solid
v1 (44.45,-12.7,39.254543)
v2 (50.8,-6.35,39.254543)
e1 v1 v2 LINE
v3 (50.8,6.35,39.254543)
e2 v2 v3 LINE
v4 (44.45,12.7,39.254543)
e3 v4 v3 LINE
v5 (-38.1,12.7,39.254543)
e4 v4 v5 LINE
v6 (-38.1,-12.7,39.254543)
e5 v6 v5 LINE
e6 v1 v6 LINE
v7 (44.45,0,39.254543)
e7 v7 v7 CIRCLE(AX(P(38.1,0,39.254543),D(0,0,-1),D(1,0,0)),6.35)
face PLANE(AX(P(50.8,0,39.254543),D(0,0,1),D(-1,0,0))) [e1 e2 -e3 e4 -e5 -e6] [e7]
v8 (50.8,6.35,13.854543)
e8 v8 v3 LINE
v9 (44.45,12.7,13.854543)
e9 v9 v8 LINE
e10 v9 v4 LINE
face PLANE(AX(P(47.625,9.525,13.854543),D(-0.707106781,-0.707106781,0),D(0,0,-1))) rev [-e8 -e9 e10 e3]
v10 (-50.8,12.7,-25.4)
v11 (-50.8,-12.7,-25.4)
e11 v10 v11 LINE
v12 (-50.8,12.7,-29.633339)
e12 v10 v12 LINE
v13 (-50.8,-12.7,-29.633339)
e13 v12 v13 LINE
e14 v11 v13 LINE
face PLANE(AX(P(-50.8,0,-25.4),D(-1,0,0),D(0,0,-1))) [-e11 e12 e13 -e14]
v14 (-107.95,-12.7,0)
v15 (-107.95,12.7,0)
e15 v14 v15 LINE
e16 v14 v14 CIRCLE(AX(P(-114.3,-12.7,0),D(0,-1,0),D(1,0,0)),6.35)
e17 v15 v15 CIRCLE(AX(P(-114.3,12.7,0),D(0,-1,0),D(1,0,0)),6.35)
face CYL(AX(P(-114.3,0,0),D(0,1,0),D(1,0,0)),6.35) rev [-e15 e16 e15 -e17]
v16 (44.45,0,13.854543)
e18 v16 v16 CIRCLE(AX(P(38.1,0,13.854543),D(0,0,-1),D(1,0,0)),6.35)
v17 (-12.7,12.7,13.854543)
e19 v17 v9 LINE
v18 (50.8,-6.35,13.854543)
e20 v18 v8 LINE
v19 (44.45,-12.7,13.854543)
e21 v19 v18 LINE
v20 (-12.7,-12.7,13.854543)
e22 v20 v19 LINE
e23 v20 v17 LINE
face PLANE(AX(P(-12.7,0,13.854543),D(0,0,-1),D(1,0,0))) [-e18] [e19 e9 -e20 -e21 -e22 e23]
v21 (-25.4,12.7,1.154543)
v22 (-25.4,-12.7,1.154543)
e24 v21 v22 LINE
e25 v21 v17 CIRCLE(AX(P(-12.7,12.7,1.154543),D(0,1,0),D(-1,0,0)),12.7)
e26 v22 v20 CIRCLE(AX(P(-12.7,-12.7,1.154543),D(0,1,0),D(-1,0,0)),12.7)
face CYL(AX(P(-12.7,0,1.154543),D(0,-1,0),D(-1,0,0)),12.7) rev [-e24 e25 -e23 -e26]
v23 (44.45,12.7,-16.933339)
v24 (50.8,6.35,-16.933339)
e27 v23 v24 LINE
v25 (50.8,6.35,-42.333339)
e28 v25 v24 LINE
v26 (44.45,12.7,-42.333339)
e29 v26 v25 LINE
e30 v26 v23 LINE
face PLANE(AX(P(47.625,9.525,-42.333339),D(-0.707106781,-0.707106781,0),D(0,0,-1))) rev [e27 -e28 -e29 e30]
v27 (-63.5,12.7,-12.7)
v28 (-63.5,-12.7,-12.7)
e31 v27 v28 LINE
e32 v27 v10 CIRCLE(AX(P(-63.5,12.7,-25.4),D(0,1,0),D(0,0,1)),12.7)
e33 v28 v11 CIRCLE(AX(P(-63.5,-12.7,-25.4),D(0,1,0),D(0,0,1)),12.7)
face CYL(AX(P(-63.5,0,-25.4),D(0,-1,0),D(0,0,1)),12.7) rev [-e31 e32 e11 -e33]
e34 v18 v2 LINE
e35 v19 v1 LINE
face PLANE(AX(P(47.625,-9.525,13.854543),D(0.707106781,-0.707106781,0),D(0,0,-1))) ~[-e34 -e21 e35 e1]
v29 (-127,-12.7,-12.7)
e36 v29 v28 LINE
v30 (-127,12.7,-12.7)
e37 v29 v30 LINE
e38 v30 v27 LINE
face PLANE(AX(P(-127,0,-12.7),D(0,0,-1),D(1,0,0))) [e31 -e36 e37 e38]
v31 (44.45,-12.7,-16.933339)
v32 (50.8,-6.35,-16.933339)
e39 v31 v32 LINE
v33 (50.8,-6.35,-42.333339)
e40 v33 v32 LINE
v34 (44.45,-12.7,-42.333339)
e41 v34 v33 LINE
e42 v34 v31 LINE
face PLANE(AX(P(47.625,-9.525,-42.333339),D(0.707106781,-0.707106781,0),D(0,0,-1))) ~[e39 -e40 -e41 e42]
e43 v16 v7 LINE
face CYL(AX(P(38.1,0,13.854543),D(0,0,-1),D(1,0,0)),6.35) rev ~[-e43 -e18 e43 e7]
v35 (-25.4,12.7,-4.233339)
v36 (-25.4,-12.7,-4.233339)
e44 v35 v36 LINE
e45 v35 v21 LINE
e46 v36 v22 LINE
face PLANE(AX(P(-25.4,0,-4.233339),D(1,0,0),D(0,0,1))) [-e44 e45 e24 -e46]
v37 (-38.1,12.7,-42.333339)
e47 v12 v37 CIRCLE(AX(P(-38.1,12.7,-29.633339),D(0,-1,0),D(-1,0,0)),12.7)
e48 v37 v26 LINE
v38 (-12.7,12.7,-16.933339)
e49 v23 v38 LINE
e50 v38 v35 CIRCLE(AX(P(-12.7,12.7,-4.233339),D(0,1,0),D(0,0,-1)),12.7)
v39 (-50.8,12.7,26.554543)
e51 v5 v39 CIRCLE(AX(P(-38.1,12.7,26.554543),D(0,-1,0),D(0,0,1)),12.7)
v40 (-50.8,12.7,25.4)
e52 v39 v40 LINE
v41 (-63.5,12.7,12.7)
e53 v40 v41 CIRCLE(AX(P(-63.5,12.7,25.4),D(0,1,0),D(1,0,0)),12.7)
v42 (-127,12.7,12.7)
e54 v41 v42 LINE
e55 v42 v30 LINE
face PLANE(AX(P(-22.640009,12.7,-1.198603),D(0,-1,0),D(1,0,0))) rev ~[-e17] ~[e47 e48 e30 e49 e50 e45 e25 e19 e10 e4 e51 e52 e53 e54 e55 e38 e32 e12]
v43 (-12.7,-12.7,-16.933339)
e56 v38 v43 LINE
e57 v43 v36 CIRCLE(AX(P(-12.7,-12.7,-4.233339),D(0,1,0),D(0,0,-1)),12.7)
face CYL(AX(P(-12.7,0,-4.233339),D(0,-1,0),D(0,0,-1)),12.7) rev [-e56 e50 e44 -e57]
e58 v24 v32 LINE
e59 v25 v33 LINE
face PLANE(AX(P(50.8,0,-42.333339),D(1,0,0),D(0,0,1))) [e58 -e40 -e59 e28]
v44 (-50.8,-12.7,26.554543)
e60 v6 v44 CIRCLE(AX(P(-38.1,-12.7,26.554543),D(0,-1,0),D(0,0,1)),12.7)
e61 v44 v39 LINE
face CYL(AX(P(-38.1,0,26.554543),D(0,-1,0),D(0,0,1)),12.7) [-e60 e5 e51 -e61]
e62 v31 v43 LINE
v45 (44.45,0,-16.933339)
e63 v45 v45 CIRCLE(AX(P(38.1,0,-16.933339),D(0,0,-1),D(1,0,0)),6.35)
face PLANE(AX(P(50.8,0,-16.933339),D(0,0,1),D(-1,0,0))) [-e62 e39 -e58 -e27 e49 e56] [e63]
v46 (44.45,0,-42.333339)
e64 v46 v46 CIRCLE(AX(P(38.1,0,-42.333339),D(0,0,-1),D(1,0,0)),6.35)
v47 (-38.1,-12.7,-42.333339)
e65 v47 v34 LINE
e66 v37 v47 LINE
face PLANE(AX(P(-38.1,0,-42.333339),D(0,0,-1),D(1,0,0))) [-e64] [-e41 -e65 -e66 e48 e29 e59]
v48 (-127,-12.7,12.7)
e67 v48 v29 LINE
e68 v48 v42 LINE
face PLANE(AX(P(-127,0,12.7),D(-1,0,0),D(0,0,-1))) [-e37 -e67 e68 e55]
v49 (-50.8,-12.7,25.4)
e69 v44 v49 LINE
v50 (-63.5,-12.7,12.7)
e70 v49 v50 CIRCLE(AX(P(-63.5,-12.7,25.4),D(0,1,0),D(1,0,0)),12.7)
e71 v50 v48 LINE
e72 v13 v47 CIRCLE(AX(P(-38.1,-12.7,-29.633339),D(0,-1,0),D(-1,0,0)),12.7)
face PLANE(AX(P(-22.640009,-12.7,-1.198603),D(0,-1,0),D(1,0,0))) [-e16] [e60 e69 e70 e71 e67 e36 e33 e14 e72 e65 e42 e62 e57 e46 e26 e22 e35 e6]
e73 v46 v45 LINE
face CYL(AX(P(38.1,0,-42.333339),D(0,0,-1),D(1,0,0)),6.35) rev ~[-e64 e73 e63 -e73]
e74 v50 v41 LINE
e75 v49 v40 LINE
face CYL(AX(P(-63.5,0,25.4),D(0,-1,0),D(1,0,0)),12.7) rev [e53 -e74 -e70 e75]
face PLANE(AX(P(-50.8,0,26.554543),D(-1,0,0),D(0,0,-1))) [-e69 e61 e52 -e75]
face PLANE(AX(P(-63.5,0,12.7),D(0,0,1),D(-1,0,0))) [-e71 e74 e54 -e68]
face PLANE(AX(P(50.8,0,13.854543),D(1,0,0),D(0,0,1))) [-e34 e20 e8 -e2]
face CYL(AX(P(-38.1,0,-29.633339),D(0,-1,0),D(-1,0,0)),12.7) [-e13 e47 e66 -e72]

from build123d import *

# Parameters (mm, degrees)
F0_R     = 6.35
F1_DEPTH = 12.7
F2_R     = 6.35
F3_DEPTH = 25.4
F4_R     = 6.35
F5_DEPTH = 25.4
F6_SIZE  = 6.35


# Not quite as in the source:
# - a feature names something its author has since deleted; it is built from what else it names


with BuildPart() as f1:
    # F0 (on Front) → F1 (new body, symmetric)
    with BuildSketch(Plane.XZ):
        with BuildLine():
            Line((-127, -12.7), (-63.5, -12.7))
            ThreePointArc((-63.5, -12.7), (-54.5197438789, -16.4197438789), (-50.8, -25.4))
            Line((-50.8, -25.4), (-50.8, -29.6333387181))
            ThreePointArc((-50.8, -29.6333387181), (-47.0802561211, -38.6135948391), (-38.1, -42.3333387181))
            Line((-38.1, -42.3333387181), (50.8, -42.3333387181))
            Line((50.8, -42.3333387181), (50.8, -16.9333387181))
            Line((50.8, -16.9333387181), (-12.7, -16.9333387181))
            ThreePointArc((-12.7, -16.9333387181), (-21.6802561211, -13.2135948391), (-25.4, -4.2333387181))
            Line((-25.4, -4.2333387181), (-25.4, 1.1545434965))
            ThreePointArc((-25.4, 1.1545434965), (-21.6802561211, 10.1347996175), (-12.7, 13.8545434965))
            Line((-12.7, 13.8545434965), (50.8, 13.8545434965))
            Line((50.8, 13.8545434965), (50.8, 39.2545434965))
            Line((50.8, 39.2545434965), (-38.1, 39.2545434965))
            ThreePointArc((-38.1, 39.2545434965), (-47.0802561211, 35.5347996175), (-50.8, 26.5545434965))
            Line((-50.8, 26.5545434965), (-50.8, 25.4))
            ThreePointArc((-50.8, 25.4), (-54.5197438789, 16.4197438789), (-63.5, 12.7))
            Line((-63.5, 12.7), (-127, 12.7))
            Line((-127, 12.7), (-127, -12.7))
        make_face()
        with Locations((-114.3, 0)):
            Circle(F0_R, mode=Mode.SUBTRACT)
    extrude(amount=F1_DEPTH, both=True)

    # F2 (on face) → F3 (cut)
    with BuildSketch(Plane(origin=(0, 0, 13.8545434965), x_dir=(1, 0, 0), z_dir=(0, 0, -1))):
        with Locations((38.1, 0)):
            Circle(F2_R)
    extrude(amount=-F3_DEPTH, mode=Mode.SUBTRACT)

    # F4 (on face) → F5 (cut)
    with BuildSketch(Plane(origin=(0, 0, -42.3333387181), x_dir=(1, 0, 0), z_dir=(0, 0, -1))):
        with Locations((38.1, 0)):
            Circle(F4_R)
    extrude(amount=-F5_DEPTH, mode=Mode.SUBTRACT)

    # F6
    f6_edges = [f1.edges().sort_by_distance(p)[0] for p in [
        (50.8, -12.7, -29.633339),
        (50.8, 12.7, -29.633339),
        (50.8, -12.7, 26.554543),
        (50.8, 12.7, 26.554543),
    ]]
    chamfer(f6_edges, length=F6_SIZE)


solid = f1.part
